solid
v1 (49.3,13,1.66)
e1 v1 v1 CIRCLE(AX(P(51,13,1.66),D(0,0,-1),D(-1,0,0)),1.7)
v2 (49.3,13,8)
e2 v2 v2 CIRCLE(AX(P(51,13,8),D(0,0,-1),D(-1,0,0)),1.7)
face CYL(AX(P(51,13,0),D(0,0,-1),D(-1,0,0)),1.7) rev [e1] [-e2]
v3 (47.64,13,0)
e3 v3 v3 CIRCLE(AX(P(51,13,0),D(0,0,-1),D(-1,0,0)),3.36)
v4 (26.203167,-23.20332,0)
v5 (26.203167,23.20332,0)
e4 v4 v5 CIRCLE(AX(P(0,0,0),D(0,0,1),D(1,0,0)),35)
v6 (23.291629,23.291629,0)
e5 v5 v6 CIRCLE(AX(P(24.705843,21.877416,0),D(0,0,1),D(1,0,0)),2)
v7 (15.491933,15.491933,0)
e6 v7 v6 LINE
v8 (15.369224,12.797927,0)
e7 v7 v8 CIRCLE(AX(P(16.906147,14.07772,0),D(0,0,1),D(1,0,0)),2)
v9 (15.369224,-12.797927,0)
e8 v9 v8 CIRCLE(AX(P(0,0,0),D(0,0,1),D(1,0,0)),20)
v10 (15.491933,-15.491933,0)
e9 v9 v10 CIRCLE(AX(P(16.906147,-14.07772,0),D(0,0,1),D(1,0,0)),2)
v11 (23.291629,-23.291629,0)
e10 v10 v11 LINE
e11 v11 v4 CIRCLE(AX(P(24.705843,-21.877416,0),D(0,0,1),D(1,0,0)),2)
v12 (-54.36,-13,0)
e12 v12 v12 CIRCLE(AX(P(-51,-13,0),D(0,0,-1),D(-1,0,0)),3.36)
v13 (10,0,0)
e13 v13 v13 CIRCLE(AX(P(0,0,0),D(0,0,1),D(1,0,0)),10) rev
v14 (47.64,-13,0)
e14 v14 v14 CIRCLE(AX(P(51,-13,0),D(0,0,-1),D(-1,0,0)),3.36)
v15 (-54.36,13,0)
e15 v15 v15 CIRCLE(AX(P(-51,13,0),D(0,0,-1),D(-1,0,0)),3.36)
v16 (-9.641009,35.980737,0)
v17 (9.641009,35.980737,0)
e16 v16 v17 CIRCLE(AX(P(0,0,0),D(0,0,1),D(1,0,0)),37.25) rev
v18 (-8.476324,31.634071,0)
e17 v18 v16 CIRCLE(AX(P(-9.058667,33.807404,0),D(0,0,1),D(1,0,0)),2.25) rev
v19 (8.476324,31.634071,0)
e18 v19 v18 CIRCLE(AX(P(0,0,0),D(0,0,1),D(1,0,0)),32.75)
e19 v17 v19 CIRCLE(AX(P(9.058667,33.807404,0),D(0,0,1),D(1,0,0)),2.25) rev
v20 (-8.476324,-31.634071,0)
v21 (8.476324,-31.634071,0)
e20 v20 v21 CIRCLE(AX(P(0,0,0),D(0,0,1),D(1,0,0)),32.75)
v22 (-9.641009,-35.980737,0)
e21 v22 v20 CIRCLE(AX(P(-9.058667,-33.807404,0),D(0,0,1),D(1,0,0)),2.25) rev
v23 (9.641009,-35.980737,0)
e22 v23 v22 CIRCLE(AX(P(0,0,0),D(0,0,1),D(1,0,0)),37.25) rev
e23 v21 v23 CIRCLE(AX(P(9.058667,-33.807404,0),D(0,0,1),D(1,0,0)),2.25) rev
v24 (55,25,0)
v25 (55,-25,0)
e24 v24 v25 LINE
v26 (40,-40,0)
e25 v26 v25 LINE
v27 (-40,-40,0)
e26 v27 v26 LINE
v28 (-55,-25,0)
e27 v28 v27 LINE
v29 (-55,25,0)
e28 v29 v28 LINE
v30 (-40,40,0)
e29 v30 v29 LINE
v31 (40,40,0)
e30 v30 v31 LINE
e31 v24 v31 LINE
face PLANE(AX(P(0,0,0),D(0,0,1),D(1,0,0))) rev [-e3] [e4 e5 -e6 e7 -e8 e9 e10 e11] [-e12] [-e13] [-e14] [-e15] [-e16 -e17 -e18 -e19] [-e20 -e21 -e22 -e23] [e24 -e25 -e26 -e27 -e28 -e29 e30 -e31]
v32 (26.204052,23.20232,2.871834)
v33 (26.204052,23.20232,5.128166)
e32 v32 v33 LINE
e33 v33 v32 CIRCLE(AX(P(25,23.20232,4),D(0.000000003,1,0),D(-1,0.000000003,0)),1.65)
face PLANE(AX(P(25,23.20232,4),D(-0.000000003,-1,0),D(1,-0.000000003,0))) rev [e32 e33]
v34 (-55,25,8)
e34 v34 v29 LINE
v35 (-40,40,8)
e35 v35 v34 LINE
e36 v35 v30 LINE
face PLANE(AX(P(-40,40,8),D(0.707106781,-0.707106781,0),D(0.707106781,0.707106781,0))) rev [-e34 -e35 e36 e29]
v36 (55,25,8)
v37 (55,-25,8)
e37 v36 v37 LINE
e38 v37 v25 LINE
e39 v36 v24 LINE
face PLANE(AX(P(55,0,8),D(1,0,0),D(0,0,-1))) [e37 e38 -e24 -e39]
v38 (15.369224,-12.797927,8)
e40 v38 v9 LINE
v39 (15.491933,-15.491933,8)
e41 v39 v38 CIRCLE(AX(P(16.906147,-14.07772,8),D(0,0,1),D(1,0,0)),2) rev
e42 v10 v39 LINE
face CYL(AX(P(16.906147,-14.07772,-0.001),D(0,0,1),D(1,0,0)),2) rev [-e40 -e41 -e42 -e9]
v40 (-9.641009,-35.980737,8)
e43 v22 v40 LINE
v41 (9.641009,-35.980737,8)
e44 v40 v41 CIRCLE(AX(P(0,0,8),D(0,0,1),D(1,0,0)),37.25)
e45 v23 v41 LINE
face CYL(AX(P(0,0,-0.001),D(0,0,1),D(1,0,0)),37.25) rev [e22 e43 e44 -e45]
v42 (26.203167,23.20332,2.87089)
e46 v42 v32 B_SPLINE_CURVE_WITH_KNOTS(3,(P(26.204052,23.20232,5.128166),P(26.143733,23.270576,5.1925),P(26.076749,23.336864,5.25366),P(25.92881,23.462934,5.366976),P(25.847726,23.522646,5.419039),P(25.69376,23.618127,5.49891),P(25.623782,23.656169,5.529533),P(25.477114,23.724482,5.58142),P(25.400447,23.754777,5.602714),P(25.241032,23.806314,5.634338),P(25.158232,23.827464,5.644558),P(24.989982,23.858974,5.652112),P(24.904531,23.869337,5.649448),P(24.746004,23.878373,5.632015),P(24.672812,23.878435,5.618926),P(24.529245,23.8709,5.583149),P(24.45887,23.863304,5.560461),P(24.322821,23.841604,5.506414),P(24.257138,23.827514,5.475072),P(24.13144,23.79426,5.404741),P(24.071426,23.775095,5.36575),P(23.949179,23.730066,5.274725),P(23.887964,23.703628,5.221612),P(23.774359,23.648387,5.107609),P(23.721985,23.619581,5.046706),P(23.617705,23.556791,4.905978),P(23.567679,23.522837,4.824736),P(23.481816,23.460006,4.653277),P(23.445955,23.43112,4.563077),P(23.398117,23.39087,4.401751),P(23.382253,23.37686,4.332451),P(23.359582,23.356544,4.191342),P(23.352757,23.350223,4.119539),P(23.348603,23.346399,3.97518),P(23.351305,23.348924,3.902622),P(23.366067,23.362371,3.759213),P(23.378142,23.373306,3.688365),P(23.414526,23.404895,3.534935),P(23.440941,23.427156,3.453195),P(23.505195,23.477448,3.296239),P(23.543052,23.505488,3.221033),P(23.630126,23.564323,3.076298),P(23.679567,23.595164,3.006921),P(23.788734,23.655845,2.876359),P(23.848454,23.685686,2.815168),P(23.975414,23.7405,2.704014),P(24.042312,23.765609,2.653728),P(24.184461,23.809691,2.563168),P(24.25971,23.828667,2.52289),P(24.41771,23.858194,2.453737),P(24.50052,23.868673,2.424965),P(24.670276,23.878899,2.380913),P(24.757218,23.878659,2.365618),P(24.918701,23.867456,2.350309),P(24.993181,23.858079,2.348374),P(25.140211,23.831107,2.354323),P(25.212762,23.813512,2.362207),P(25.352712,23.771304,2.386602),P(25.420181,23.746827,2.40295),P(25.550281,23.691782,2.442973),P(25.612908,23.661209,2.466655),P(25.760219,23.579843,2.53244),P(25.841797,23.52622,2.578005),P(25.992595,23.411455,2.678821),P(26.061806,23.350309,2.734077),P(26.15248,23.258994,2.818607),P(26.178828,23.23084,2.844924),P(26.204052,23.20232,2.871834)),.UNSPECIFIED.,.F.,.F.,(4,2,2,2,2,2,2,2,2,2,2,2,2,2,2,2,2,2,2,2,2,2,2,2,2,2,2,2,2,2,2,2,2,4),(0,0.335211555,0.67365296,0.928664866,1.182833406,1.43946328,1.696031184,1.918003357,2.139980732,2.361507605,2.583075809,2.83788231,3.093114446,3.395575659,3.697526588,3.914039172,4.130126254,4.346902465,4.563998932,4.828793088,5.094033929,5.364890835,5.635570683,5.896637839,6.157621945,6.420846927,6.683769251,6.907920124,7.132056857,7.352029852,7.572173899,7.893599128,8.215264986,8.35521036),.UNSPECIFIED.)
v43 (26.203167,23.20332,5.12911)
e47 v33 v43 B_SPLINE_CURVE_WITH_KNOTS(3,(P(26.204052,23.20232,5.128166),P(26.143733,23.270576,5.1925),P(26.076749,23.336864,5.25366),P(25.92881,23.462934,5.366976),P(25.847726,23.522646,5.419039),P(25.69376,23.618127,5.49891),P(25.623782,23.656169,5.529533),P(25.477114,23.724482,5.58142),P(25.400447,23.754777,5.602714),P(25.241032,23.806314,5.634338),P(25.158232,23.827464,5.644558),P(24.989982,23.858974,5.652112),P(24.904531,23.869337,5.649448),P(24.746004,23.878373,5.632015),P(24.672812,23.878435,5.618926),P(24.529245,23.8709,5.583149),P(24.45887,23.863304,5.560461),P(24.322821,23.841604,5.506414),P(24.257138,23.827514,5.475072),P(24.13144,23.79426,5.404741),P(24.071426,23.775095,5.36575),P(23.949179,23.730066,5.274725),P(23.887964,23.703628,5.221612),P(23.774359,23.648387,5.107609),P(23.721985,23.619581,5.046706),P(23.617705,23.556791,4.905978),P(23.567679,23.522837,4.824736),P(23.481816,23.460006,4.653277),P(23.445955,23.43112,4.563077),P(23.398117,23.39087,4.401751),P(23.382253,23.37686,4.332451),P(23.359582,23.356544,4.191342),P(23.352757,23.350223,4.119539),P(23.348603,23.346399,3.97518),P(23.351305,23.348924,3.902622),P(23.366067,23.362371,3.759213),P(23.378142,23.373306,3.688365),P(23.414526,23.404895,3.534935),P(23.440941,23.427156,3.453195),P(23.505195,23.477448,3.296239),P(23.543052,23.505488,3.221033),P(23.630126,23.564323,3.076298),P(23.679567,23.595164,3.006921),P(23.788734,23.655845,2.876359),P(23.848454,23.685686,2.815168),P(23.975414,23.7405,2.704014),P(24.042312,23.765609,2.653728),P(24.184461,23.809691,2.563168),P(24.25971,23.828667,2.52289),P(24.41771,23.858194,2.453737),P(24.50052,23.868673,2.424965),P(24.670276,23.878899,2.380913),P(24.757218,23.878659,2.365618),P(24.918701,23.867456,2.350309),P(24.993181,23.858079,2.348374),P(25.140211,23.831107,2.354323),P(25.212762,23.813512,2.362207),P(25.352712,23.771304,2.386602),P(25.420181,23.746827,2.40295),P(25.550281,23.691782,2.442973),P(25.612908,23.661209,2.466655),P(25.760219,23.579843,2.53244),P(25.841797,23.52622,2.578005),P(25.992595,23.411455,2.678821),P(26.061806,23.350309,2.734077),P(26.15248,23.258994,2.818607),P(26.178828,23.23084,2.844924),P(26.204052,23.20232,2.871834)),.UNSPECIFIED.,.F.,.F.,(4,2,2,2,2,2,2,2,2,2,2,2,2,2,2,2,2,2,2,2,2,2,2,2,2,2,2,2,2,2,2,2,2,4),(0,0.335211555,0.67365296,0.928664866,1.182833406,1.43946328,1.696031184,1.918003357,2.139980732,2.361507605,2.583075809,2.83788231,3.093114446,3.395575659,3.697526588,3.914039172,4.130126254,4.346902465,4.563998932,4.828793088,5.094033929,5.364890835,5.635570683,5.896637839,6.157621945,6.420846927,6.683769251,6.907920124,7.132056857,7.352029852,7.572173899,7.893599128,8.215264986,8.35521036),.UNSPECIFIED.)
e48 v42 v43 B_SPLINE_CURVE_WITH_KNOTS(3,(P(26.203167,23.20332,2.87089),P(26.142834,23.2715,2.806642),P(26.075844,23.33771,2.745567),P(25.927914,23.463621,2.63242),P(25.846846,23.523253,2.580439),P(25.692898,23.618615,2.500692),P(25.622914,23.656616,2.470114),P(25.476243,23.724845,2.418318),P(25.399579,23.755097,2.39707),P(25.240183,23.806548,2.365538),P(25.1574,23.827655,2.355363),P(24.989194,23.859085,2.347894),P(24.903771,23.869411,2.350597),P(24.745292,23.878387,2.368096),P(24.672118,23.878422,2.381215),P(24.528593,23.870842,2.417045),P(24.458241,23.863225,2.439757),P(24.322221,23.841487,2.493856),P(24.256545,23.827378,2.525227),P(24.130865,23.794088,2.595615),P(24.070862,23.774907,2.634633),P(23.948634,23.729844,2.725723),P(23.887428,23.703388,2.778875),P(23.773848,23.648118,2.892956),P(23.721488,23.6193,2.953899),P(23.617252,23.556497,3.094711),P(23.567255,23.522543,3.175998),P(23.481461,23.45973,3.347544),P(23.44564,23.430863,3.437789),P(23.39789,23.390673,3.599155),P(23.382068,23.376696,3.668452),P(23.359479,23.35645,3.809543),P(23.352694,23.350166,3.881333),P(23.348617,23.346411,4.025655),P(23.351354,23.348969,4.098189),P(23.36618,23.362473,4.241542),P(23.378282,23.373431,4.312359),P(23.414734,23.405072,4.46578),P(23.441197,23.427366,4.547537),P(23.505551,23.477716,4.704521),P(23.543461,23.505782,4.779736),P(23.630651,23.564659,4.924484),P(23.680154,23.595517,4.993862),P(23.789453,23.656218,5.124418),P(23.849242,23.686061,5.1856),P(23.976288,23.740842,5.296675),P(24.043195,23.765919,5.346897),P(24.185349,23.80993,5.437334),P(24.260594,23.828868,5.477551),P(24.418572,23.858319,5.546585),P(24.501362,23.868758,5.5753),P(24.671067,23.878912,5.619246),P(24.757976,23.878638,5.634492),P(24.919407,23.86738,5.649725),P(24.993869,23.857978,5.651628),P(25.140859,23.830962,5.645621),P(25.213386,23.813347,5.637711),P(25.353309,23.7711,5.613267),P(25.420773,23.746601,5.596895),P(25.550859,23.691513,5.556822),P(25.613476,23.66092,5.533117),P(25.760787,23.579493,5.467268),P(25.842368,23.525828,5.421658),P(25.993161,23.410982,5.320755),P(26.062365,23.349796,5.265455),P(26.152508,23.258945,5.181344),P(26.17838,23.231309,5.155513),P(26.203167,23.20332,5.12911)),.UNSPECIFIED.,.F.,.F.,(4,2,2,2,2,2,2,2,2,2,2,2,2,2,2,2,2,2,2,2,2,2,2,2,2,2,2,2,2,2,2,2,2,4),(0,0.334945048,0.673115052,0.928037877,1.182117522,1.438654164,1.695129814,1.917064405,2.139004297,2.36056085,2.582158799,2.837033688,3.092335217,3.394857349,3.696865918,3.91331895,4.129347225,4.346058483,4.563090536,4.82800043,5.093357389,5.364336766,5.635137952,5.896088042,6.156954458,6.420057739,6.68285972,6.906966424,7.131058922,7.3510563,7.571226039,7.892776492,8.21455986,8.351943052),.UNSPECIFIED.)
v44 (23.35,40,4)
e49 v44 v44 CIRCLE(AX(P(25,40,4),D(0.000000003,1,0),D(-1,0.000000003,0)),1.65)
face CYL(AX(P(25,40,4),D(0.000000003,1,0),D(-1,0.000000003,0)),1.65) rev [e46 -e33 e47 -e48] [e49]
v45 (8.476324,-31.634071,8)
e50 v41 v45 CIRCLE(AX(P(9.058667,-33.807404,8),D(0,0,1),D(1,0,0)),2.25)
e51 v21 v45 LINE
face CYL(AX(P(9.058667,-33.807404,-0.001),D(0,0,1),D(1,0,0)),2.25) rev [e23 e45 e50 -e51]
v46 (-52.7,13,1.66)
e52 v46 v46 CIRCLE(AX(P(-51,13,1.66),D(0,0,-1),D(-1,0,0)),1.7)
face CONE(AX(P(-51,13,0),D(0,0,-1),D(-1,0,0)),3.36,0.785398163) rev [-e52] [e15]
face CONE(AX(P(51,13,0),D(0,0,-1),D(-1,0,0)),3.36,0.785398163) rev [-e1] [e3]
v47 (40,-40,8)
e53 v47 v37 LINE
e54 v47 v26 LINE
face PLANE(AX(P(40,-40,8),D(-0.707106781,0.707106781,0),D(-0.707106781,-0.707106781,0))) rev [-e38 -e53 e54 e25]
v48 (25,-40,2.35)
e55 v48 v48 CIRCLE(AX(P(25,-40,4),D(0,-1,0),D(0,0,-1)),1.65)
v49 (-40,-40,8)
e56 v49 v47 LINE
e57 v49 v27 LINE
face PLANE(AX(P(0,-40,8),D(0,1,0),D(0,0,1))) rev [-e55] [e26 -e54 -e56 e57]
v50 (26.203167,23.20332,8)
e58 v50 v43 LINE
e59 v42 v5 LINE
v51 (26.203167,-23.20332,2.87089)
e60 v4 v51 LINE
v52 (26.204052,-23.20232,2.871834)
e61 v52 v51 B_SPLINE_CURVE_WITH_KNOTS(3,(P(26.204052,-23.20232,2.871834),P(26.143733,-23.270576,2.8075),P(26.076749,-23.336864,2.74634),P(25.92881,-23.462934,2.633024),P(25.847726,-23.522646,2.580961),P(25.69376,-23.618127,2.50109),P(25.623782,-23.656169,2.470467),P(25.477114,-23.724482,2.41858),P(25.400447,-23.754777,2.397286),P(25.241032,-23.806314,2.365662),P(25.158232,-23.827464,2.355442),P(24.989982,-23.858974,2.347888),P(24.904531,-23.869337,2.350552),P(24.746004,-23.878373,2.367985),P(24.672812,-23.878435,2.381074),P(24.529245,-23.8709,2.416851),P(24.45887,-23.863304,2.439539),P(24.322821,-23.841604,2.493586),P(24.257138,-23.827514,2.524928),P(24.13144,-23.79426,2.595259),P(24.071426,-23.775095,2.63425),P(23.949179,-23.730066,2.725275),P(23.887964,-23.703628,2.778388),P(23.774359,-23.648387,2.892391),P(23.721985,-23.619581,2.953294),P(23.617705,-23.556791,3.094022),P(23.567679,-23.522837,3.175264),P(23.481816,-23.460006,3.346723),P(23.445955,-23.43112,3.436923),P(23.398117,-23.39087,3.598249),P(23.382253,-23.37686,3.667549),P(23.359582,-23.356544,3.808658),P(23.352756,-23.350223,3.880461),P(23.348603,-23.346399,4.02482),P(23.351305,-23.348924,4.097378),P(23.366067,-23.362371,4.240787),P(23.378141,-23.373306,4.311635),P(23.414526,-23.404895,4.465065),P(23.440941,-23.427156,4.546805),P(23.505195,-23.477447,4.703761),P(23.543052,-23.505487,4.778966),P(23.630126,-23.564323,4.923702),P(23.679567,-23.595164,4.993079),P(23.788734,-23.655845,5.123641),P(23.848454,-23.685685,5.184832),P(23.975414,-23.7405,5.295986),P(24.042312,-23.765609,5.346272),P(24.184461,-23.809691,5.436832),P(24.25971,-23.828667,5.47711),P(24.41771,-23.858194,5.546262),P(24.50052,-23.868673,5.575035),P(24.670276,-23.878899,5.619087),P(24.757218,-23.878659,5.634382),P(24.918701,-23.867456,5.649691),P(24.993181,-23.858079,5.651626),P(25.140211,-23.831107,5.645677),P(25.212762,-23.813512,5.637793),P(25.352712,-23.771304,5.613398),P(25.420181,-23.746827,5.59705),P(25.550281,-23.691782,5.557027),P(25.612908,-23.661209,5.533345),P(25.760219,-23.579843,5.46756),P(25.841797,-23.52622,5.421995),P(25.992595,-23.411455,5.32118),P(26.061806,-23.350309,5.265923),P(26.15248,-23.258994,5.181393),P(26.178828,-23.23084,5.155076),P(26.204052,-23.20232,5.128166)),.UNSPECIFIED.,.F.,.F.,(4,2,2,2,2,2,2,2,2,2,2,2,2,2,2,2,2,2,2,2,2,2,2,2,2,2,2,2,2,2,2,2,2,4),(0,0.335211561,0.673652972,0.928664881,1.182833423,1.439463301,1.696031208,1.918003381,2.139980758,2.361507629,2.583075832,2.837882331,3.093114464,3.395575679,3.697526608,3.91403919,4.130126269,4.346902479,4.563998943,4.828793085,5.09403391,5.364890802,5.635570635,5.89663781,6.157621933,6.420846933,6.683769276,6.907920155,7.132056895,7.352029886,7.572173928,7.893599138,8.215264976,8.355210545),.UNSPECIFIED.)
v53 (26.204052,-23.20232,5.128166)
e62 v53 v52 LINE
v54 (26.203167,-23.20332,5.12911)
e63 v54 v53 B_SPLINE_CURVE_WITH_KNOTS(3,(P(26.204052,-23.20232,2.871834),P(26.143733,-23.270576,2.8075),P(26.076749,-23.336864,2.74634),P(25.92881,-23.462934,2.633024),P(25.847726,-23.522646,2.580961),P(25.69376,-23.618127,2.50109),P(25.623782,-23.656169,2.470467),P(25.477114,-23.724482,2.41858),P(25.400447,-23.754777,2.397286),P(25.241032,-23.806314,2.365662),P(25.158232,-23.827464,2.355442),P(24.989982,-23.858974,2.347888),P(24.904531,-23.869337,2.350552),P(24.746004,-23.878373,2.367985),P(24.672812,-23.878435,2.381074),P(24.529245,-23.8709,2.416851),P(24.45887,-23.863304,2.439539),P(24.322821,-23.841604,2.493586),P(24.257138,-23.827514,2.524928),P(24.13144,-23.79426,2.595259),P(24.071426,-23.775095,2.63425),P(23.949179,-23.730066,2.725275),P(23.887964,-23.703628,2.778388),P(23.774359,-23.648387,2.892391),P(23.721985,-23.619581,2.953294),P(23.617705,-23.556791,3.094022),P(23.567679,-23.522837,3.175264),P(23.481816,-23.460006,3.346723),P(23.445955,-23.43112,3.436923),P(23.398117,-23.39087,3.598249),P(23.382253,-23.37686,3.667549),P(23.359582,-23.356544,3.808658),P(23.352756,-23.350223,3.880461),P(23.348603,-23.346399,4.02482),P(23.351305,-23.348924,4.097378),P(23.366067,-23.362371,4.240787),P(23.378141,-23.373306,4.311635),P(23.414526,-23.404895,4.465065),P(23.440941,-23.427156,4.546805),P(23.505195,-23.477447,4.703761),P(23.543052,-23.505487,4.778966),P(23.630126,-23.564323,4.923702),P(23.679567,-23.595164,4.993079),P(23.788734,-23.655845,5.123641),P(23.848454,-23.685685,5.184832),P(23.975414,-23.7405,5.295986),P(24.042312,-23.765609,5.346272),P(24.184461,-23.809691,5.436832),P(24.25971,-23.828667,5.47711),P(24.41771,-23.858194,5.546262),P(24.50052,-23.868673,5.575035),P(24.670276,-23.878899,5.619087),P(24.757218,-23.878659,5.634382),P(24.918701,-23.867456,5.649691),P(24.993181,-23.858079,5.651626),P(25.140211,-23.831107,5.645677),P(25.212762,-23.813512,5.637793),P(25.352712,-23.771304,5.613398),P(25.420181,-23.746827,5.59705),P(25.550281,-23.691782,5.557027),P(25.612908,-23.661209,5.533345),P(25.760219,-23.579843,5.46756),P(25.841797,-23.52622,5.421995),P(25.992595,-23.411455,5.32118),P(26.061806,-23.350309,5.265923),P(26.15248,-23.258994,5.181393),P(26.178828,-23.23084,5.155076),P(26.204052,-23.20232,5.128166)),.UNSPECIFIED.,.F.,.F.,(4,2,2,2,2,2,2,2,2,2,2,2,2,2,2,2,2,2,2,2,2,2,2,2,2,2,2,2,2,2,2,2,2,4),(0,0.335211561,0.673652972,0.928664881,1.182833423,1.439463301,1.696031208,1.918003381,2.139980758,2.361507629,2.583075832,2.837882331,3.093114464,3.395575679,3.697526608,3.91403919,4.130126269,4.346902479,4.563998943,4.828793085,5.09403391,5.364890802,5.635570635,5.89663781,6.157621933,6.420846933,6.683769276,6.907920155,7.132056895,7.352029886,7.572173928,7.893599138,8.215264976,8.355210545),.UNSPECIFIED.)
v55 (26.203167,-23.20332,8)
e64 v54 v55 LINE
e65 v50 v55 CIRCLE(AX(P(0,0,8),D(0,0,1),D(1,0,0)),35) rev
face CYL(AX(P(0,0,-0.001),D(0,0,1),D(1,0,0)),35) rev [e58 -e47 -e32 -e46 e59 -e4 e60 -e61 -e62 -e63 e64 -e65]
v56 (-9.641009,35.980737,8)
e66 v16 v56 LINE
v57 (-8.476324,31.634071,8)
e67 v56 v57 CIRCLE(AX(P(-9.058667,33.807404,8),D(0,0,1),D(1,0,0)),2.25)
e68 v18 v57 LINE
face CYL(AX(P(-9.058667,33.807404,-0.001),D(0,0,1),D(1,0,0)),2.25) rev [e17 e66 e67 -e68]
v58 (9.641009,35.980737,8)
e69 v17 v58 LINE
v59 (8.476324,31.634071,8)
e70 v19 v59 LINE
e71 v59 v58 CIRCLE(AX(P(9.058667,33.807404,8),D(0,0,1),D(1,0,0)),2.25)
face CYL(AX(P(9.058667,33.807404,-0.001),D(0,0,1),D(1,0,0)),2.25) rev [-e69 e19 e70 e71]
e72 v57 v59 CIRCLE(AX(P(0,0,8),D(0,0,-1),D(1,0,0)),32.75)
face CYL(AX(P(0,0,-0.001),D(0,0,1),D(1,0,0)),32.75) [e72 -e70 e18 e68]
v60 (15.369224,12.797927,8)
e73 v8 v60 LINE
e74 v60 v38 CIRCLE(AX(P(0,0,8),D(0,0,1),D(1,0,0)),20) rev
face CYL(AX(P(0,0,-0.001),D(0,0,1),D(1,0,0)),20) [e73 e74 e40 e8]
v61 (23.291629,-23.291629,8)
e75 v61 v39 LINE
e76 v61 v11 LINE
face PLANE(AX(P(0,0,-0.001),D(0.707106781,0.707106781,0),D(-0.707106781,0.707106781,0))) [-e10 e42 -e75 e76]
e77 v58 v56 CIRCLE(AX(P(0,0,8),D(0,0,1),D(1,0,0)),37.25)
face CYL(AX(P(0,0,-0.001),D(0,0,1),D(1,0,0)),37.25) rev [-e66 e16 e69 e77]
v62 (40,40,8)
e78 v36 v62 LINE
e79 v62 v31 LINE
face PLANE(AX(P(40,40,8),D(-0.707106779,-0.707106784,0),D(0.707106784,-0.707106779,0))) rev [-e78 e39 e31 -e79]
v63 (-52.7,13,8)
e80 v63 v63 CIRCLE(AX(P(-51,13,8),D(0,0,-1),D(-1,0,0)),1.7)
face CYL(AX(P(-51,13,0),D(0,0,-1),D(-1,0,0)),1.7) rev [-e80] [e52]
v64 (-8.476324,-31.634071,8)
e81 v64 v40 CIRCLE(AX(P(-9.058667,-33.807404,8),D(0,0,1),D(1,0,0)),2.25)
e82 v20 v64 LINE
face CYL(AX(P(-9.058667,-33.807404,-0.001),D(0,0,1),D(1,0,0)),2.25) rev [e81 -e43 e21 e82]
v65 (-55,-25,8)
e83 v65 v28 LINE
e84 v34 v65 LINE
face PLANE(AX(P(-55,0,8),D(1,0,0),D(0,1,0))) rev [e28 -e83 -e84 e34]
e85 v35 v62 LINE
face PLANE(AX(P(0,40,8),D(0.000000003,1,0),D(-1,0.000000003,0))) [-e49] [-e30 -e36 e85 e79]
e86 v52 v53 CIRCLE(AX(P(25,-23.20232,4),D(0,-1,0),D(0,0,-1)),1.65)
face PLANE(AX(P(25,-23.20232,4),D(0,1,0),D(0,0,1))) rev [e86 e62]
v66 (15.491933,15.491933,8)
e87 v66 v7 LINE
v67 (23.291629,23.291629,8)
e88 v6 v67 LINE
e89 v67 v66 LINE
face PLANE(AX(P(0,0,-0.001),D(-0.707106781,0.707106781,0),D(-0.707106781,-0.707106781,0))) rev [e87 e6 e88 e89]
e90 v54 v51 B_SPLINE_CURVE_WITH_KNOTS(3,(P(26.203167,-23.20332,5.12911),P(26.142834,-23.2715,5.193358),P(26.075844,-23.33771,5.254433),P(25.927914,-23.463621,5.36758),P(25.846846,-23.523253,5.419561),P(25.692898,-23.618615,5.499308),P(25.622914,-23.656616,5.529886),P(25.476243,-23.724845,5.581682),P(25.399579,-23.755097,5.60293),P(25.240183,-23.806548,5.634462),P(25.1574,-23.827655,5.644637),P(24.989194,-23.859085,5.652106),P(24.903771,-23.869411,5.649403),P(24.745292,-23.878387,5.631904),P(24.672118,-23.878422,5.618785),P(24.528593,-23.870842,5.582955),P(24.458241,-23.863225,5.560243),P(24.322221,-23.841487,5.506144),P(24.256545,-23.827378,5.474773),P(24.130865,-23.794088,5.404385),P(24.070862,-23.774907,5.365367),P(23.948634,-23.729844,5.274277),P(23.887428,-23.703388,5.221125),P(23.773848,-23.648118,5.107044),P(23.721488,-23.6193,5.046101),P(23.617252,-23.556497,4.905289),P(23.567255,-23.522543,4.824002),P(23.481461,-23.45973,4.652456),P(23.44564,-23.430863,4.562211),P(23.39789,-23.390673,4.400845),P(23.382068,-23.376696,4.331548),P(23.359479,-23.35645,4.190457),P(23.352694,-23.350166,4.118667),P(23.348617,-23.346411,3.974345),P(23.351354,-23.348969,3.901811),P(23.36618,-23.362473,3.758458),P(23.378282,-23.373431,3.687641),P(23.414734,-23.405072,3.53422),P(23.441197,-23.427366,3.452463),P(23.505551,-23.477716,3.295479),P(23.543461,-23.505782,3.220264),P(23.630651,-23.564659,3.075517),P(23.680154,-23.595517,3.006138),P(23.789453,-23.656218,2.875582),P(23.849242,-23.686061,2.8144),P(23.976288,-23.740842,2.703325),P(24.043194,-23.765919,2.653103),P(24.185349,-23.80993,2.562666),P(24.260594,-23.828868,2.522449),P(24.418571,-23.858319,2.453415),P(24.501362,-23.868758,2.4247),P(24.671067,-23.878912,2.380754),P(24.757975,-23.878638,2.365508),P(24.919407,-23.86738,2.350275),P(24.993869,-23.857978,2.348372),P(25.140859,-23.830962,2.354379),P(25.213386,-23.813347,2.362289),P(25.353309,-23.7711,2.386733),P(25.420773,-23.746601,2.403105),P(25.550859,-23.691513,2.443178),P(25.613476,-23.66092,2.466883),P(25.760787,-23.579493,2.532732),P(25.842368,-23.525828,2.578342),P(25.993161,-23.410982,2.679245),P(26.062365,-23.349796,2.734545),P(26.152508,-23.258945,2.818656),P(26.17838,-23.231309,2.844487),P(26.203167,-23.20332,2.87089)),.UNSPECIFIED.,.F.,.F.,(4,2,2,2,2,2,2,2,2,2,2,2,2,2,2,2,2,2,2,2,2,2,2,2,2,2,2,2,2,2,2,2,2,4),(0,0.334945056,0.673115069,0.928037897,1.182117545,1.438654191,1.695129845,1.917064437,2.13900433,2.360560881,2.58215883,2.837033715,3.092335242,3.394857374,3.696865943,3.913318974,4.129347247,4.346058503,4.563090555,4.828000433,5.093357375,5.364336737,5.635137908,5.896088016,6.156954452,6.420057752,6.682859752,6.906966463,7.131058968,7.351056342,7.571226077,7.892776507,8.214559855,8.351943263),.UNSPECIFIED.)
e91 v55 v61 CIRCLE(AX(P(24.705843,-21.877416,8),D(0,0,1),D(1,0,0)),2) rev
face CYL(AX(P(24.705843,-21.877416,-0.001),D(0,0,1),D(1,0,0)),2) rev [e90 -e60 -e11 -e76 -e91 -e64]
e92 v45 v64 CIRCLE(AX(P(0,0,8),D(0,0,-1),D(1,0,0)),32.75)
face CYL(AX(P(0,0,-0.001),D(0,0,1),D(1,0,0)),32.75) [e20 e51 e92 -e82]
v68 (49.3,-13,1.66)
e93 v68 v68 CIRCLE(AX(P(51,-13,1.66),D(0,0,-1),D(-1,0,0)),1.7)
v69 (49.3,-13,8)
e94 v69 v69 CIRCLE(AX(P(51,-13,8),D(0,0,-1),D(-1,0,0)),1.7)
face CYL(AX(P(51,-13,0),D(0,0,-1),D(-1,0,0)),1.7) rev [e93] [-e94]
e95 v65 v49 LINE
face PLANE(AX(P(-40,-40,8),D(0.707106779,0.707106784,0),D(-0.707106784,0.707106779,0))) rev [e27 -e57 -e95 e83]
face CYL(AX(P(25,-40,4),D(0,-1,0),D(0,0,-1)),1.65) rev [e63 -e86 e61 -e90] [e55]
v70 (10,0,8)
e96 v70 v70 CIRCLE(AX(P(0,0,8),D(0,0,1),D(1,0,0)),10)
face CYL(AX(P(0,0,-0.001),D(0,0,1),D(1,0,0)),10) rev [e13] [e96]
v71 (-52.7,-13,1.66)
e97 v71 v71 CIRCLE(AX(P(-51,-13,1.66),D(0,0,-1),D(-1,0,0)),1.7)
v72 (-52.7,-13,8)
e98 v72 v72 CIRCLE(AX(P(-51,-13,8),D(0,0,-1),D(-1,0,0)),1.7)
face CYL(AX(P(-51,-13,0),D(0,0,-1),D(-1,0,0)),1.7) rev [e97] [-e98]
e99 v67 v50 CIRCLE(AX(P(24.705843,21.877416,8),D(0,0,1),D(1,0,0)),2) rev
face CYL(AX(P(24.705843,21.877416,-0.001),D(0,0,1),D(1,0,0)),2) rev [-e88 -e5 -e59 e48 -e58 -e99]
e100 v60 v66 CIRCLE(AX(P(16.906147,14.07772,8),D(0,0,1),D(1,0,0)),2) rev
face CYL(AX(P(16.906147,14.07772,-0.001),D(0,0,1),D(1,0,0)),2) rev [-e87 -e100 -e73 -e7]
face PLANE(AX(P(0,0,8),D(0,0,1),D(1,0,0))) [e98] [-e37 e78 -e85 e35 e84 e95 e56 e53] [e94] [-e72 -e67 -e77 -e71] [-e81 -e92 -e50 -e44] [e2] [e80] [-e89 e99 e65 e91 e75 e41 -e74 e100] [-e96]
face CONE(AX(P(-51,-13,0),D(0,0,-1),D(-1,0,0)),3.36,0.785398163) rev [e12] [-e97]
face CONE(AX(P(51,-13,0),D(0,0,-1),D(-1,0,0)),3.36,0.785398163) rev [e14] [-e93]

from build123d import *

# Parameters (mm, degrees)
SKETCH_1_W                   = 80
SKETCH_1_H                   = 14.999999944
SKETCH_1_H_2                 = 50
SKETCH_1_W_2                 = 14.999999944
SKETCH_1_W_3                 = 15.000000056
EXTRUDE_1_DEPTH              = 8
AXISHOLE_REACH               = 70.476
SKETCH_2_R                   = 10
LOCKINGSLOT_REACH            = 70.476
ADJUSTSLOT_REACH             = 70.476
FILLET_1_R                   = 2
HOLE_START                   = -39.999999944
HOLE_WIZARD_M4_1_OUTLINE_R   = 1.65
HOLE_WIZARD_M4_1_DEPTH       = 16.797680198
HOLE_WIZARD_M3_1_D           = 3.4
HOLE_WIZARD_M3_1_CSINK_D     = 6.72
HOLE_WIZARD_M3_1_CSINK_ANGLE = 90


# Read off the part's stored shape, not the designer's step: M4 나사 구멍1
with BuildPart() as part:
    # 스케치1 → 보스-돌출1 (new body)
    with BuildSketch(Plane.XY):
        with Locations((-5.6e-08, -32.499999972)):
            Rectangle(SKETCH_1_W, SKETCH_1_H)
        with Locations((-5.6e-08, 0)):
            Rectangle(SKETCH_1_W, SKETCH_1_H_2)
        Polygon((39.999999944, 39.999999832), (-40.000000056, 40.000000056), (-40.000000056, 25), (39.999999944, 25), align=None)
        with Locations((47.499999916, 0)):
            Rectangle(SKETCH_1_W_2, SKETCH_1_H_2)
        with Locations((-47.500000084, 0)):
            Rectangle(SKETCH_1_W_3, SKETCH_1_H_2)
        Polygon((-40.000000056, -25), (-55.000000112, -25), (-40.000000056, -39.999999944), align=None)
        Polygon((54.999999888, -25), (39.999999944, -25), (39.999999944, -39.999999944), align=None)
        Polygon((54.999999888, 25), (39.999999944, 39.999999832), (39.999999944, 25), align=None)
        Polygon((-40.000000056, 25), (-40.000000056, 40.000000056), (-55.000000112, 25), align=None)
    extrude(amount=EXTRUDE_1_DEPTH)

    # 스케치2 → AXISHOLE (cut, up to next)
    with BuildSketch(Plane.XY.offset(8), mode=Mode.PRIVATE) as axishole_sk1:
        Circle(SKETCH_2_R)
    axishole_tool1 = extrude(axishole_sk1.sketch, amount=-AXISHOLE_REACH, mode=Mode.PRIVATE) & part.part
    add(axishole_tool1.solids().sort_by_distance((0, 0, 8))[0], mode=Mode.SUBTRACT)

    # 스케치3 → LOCKINGSLOT (cut, up to next)
    with BuildSketch(Plane.XY.offset(8), mode=Mode.PRIVATE) as lockingslot_sk1:
        with BuildLine():
            ThreePointArc((-9.64100943, -35.980737029), (0, -37.25), (9.64100943, -35.980737029))
            ThreePointArc((9.64100943, -35.980737029), (11.231999688, -33.225061069), (8.476323727, -31.634070811))
            ThreePointArc((8.476323727, -31.634070811), (0, -32.75), (-8.476323727, -31.634070811))
            ThreePointArc((-8.476323727, -31.634070811), (-11.231999688, -33.225061069), (-9.64100943, -35.980737029))
        make_face()
    lockingslot_tool1 = extrude(lockingslot_sk1.sketch, amount=-LOCKINGSLOT_REACH, mode=Mode.PRIVATE) & part.part
    # 스케치3 → LOCKINGSLOT (cut, up to next)
    with BuildSketch(Plane.XY.offset(8), mode=Mode.PRIVATE) as lockingslot_sk2:
        with BuildLine():
            ThreePointArc((9.64100943, 35.980737029), (0, 37.25), (-9.64100943, 35.980737029))
            ThreePointArc((-9.64100943, 35.980737029), (-11.231999688, 33.225061069), (-8.476323727, 31.634070811))
            ThreePointArc((-8.476323727, 31.634070811), (0, 32.75), (8.476323727, 31.634070811))
            ThreePointArc((8.476323727, 31.634070811), (11.231999688, 33.225061069), (9.64100943, 35.980737029))
        make_face()
    lockingslot_tool2 = extrude(lockingslot_sk2.sketch, amount=-LOCKINGSLOT_REACH, mode=Mode.PRIVATE) & part.part
    add(lockingslot_tool1.solids().sort_by_distance((0, -34.473161, 8))[0], mode=Mode.SUBTRACT)
    add(lockingslot_tool2.solids().sort_by_distance((0, 34.473161, 8))[0], mode=Mode.SUBTRACT)

    # 스케치4 → ADJUSTSLOT (cut, up to next)
    with BuildSketch(Plane.XY.offset(8), mode=Mode.PRIVATE) as adjustslot_sk1:
        with BuildLine():
            Line((24.748737262, 24.748737262), (14.142135545, 14.142135545))
            ThreePointArc((14.142135545, 14.142135545), (19.999999888, 0), (14.142135545, -14.142135545))
            Line((14.142135545, -14.142135545), (24.748737262, -24.748737262))
            ThreePointArc((24.748737262, -24.748737262), (34.999999888, 0), (24.748737262, 24.748737262))
        make_face()
    adjustslot_tool1 = extrude(adjustslot_sk1.sketch, amount=-ADJUSTSLOT_REACH, mode=Mode.PRIVATE) & part.part
    add(adjustslot_tool1.solids().sort_by_distance((25.372551, 0, 8))[0], mode=Mode.SUBTRACT)

    # 필렛1
    fillet_1_edges = [part.edges().sort_by_distance(p)[0] for p in [
        (24.748737262, 24.748737262, 4),
        (24.748737262, -24.748737262, 4),
        (14.142135545, -14.142135545, 4),
        (14.142135545, 14.142135545, 4),
    ]]
    fillet(fillet_1_edges, radius=FILLET_1_R)

    # M4 나사 구멍1 outline → M4 나사 구멍1 (cut)
    with BuildSketch(Plane(origin=(0, 0, 0), x_dir=(1, 0, 0), z_dir=(0, 1, 0)).offset(HOLE_START)):
        with Locations((24.999999888, -4)):
            Circle(HOLE_WIZARD_M4_1_OUTLINE_R)
    hole_wizard_m4_1 = extrude(amount=HOLE_WIZARD_M4_1_DEPTH, mode=Mode.SUBTRACT)

    # 대칭 복사1: M4 나사 구멍1 across plane
    add(hole_wizard_m4_1.mirror(Plane(origin=(0, 0, 0), x_dir=(0, 0, 1), z_dir=(-1.3990850145084723e-09, -1.0, 0))), mode=Mode.SUBTRACT)

    # M3 육각 소켓 접시 머리 캡 나사용 카운터싱크1 (through all)
    with Locations(Plane(origin=(0, 0, 0), x_dir=(-1, 0, 0), z_dir=(0, 0, -1))):
        with Locations((51.000000112, -13), (51.000000112, 13), (-51.000000112, -13), (-51.000000112, 13)):
            CounterSinkHole(HOLE_WIZARD_M3_1_D / 2, HOLE_WIZARD_M3_1_CSINK_D / 2, counter_sink_angle=HOLE_WIZARD_M3_1_CSINK_ANGLE)


solid = part.part
